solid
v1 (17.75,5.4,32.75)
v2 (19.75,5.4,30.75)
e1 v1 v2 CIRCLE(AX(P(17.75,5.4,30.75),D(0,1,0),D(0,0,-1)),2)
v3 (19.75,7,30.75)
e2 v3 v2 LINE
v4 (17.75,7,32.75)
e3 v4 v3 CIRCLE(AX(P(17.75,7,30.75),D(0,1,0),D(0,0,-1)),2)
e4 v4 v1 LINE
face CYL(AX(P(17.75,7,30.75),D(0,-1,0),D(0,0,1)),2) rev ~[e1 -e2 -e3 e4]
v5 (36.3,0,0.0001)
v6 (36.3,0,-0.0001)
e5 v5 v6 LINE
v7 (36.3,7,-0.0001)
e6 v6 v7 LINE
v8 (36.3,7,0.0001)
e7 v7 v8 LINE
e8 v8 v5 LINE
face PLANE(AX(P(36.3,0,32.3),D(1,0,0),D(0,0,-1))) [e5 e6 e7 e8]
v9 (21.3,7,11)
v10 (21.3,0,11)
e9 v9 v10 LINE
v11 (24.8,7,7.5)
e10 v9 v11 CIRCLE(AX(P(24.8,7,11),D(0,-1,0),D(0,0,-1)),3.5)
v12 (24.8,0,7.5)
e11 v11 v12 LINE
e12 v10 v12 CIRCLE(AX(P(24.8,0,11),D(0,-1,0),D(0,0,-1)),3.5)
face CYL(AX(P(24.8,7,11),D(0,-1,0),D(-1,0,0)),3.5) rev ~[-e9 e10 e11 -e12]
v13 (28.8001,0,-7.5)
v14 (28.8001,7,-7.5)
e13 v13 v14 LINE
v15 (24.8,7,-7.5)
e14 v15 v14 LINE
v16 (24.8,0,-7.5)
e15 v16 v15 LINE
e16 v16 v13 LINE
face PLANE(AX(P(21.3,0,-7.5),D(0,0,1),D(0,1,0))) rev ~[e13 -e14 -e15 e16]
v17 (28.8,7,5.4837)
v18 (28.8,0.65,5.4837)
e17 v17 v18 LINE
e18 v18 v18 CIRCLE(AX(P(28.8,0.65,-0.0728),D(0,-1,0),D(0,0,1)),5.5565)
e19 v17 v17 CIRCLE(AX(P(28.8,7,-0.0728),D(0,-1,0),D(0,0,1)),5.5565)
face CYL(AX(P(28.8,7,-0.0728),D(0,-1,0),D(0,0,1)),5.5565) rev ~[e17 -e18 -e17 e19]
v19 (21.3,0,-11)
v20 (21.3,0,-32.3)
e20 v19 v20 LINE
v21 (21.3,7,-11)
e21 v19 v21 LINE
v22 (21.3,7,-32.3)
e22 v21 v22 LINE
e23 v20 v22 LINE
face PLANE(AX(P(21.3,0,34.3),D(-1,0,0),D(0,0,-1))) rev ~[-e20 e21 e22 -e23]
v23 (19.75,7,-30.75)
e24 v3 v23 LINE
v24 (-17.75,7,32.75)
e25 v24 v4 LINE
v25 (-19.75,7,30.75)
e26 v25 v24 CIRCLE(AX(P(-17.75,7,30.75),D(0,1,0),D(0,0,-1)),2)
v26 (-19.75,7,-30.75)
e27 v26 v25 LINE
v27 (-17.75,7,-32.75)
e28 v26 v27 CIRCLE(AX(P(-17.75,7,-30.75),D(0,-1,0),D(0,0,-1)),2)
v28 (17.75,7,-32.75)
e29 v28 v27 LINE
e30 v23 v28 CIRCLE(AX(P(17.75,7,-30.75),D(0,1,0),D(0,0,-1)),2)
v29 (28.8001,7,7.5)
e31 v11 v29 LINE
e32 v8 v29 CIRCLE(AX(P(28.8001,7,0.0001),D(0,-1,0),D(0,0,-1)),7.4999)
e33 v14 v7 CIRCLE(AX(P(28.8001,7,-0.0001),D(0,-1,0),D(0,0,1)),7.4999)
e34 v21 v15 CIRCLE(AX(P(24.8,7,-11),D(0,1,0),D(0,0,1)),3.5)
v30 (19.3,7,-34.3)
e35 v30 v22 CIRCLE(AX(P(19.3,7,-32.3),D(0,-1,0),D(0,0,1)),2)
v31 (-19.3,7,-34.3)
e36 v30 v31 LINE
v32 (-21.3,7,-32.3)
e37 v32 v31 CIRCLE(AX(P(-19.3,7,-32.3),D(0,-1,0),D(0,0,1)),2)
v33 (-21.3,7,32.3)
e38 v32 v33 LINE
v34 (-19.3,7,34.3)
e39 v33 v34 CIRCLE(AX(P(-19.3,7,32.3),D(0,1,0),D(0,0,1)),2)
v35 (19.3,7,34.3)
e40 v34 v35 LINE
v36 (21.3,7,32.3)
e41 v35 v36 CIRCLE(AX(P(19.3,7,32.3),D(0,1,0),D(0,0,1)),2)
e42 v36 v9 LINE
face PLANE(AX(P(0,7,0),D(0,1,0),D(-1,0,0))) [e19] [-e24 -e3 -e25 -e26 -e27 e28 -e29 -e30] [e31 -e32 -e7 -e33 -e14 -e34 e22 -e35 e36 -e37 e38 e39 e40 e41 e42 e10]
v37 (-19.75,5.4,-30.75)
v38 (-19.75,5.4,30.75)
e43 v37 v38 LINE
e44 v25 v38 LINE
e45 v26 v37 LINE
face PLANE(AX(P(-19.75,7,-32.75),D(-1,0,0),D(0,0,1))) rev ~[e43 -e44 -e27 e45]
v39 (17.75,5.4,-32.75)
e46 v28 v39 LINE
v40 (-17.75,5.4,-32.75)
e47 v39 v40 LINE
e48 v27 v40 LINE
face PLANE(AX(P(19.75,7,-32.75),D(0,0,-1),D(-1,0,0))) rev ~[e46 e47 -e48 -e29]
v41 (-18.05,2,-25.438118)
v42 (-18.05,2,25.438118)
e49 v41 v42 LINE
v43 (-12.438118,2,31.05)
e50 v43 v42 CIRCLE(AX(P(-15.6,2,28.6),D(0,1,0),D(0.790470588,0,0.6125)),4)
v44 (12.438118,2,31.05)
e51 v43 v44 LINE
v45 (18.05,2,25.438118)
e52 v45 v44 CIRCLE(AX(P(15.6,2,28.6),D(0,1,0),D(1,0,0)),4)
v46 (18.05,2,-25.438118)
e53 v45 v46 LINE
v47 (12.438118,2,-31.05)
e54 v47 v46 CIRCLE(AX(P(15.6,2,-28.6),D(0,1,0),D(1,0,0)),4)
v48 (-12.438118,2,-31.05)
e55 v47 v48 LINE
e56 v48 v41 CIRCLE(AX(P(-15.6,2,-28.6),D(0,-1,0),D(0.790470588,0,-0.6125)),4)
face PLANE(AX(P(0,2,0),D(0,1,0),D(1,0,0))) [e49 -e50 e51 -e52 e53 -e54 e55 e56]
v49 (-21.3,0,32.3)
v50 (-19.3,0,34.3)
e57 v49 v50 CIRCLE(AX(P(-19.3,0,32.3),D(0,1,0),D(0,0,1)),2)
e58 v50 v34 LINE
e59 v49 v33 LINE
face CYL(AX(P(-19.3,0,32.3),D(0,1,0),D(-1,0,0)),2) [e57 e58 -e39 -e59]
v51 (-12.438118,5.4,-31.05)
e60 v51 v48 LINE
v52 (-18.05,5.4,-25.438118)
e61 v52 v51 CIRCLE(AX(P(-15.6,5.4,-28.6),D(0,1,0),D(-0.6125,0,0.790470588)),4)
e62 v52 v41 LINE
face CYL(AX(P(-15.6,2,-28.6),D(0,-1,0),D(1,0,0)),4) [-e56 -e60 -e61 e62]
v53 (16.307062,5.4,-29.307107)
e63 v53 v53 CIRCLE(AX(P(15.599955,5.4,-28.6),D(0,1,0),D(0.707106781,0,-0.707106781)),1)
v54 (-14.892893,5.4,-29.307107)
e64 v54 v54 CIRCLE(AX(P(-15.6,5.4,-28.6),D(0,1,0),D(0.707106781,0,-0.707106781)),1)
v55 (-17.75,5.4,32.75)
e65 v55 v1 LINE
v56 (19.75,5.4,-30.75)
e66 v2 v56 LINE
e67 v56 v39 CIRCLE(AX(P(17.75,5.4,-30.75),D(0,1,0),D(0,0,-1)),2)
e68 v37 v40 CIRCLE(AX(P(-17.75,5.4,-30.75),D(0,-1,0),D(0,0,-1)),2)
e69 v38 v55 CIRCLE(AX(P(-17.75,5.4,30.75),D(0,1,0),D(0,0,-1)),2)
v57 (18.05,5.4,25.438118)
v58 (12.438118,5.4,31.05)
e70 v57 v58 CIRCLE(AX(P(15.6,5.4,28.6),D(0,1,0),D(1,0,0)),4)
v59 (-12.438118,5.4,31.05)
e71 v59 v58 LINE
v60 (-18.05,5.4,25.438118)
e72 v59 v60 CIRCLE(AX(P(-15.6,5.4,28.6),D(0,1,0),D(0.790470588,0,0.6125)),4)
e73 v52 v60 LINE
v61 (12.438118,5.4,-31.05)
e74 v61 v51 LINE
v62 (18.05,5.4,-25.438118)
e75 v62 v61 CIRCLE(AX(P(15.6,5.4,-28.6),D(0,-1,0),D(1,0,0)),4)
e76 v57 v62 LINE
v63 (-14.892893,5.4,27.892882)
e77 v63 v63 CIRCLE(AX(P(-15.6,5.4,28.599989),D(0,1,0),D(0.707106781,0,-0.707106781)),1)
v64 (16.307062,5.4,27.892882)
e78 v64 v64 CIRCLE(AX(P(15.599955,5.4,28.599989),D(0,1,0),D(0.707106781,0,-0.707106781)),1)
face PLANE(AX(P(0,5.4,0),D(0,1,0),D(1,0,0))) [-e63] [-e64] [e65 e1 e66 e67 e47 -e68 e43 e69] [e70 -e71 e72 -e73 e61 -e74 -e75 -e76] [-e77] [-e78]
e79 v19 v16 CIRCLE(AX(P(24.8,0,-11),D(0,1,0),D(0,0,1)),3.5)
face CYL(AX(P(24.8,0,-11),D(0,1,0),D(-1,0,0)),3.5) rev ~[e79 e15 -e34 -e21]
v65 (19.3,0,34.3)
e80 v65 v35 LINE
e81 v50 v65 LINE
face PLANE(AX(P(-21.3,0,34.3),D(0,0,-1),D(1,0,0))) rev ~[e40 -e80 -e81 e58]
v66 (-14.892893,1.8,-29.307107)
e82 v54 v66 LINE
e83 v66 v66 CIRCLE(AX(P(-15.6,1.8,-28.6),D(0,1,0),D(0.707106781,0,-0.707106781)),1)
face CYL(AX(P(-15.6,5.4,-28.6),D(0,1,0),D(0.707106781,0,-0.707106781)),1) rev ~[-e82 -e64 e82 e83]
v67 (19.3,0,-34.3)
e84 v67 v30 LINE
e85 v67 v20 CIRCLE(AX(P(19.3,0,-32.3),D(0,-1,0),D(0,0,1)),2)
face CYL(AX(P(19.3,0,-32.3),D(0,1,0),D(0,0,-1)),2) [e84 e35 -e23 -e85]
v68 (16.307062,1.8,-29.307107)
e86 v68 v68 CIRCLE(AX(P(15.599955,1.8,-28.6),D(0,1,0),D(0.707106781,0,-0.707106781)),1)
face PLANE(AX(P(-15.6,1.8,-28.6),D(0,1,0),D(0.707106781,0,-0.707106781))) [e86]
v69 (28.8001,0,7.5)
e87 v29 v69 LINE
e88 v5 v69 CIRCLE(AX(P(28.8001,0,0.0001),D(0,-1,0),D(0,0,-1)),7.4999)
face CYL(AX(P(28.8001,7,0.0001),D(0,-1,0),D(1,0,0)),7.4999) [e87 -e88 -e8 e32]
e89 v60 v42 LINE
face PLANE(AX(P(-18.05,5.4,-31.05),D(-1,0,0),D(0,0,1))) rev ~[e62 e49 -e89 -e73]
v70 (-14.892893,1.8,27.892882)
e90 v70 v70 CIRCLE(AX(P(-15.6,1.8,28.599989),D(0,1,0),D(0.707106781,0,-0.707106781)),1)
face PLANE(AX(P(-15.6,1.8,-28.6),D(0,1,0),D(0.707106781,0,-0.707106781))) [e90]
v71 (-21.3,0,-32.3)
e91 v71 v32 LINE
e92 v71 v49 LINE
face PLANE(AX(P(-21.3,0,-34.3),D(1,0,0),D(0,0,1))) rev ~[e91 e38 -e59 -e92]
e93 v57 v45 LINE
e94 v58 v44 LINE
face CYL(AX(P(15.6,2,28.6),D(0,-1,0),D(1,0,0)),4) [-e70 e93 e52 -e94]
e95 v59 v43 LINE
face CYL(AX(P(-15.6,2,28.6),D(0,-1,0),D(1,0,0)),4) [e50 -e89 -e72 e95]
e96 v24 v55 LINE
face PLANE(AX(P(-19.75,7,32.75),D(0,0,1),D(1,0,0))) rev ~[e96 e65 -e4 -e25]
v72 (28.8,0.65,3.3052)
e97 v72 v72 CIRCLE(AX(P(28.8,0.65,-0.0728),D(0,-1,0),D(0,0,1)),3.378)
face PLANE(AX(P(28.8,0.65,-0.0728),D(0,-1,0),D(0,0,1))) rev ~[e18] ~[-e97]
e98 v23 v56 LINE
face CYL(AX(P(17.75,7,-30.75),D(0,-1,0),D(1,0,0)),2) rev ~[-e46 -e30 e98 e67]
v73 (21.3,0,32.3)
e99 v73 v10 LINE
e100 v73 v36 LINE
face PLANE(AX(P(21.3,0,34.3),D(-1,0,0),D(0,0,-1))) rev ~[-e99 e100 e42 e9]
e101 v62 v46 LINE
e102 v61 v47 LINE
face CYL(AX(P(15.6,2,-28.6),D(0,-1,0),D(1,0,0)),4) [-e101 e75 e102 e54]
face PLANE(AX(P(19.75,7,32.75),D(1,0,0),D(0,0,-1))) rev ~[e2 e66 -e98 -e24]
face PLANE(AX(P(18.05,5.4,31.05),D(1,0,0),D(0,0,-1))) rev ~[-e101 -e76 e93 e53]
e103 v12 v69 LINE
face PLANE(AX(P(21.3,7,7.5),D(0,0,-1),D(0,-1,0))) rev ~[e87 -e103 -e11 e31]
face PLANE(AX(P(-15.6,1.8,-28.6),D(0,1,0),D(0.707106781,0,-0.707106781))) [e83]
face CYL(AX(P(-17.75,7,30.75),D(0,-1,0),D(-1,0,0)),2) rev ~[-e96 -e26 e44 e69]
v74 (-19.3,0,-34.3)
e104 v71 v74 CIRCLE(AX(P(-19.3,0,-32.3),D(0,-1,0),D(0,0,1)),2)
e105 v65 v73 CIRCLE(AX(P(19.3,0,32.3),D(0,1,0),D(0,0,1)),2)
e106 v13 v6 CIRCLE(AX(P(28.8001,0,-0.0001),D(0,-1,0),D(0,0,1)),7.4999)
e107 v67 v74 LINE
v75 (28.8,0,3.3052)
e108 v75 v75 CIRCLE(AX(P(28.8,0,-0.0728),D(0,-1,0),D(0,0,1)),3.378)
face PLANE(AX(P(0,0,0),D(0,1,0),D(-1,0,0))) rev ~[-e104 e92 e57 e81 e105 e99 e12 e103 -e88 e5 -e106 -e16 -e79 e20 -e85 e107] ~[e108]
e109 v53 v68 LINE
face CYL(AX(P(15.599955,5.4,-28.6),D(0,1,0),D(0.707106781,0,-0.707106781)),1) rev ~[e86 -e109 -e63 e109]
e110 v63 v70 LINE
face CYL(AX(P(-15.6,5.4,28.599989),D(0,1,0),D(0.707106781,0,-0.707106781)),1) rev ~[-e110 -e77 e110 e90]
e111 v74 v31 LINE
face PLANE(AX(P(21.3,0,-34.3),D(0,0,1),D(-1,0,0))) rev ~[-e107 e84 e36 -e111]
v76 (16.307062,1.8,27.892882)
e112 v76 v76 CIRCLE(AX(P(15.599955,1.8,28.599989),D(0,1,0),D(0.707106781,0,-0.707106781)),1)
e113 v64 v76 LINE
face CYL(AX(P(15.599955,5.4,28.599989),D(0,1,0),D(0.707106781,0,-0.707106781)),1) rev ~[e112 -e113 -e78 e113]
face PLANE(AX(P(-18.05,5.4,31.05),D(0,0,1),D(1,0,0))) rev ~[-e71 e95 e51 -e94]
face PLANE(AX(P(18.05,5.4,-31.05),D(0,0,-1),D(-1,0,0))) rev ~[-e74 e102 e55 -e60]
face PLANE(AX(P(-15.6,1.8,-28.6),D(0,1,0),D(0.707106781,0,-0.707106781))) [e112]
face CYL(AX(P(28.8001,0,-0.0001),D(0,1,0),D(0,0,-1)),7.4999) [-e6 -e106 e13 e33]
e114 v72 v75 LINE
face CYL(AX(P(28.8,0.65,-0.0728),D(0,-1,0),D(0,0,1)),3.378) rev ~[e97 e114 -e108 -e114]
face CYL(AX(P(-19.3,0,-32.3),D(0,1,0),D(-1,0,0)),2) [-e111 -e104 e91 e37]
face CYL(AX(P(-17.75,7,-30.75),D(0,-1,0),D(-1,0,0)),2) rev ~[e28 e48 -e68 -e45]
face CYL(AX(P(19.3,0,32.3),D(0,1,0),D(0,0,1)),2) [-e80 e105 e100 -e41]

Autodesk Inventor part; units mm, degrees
ref_plane "YZ Plane" through (0, 0, 0) normal (1, 0, 0) x (0, 1, 0)
ref_plane "XZ Plane" through (0, 0, 0) normal (0, 1, 0) x (-1, 0, 0)
ref_plane "XY Plane" through (0, 0, 0) normal (0, 0, 1) x (1, 0, 0)
sketch "Sketch1" plane through (0, 0, 0) normal (0, 1, 0) x (-1, 0, 0)
  line L0 (21.3, 34.3) -> (-21.3, 34.3)
  line L1 (-21.3, 34.3) -> (-21.3, -34.3)
  line L2 (-21.3, -34.3) -> (21.3, -34.3)
  line L3 (21.3, -34.3) -> (21.3, 34.3)
  line L4 (21.3, 34.3) -> (-21.3, -34.3) construction
  line L5 (-21.3, 34.3) -> (21.3, -34.3) construction
  point P0 (0, 0)
  dimension "d0" = 42.6
  dimension "d1" = 68.6
extrude "Extrusion1" add sketch "Sketch1" along normal blind 7
sketch "Sketch2" plane through (0, 7, 0) normal (0, 1, 0) x (1, 0, 0)
  line L0 (-19.75, -32.75) -> (19.75, -32.75)
  line L1 (19.75, -32.75) -> (19.75, 32.75)
  line L2 (19.75, 32.75) -> (-19.75, 32.75)
  line L3 (-19.75, 32.75) -> (-19.75, -32.75)
  line L4 (-19.75, -32.75) -> (19.75, 32.75) construction
  line L5 (19.75, -32.75) -> (-19.75, 32.75) construction
  point P0 (0, 0)
  dimension "d4" = 39.5
  dimension "d5" = 65.5
extrude "Extrusion2" cut sketch "Sketch2" against normal blind 1.6
sketch "Sketch3" plane through (0, 5.4, 0) normal (0, 1, 0) x (1, 0, 0)
  line L0 (-18.05, -31.05) -> (18.05, -31.05)
  line L1 (18.05, -31.05) -> (18.05, 31.05)
  line L2 (18.05, 31.05) -> (-18.05, 31.05)
  line L3 (-18.05, 31.05) -> (-18.05, -31.05)
  line L4 (-18.05, -31.05) -> (18.05, 31.05) construction
  line L5 (18.05, -31.05) -> (-18.05, 31.05) construction
  point P0 (0, 0)
  dimension "d8" = 36.1
  dimension "d9" = 62.1
extrude "Extrusion3" cut sketch "Sketch3" against normal blind 3.4
sketch "Sketch4" plane through (0, 2, 0) normal (0, 1, 0) x (1, 0, 0)
  circle A0 centre (-15.6, 28.6) radius 4
  circle A1 centre (15.6, 28.6) radius 4
  circle A2 centre (-15.6, -28.6) radius 4
  circle A3 centre (15.6, -28.6) radius 4
  line L0 (-18.05, 31.05) -> (18.05, 31.05) projected
  line L1 (-18.05, -31.05) -> (-18.05, 31.05) projected
  point P0 (0, 0)
  dimension "d12" = 31.2
  dimension "d13" = 31.2
  dimension "d14" = 57.2
  dimension "d15" = 57.2
  dimension "d16" = 8
  dimension "d17" = 8
  dimension "d18" = 8
  dimension "d19" = 8
  dimension "d22" = 0
  dimension "d23" = 15.6
  dimension "d24" = 28.6
  dimension "d25" = 0
extrude "Extrusion4" add sketch "Sketch4" along normal blind 3.4
sketch "Sketch5" plane through (-15.6, 5.4, -28.6) normal (0, 1, 0) x (0.7071068, 0, -0.7071068)
  arc A0 (-3.9682, -0.5034) -> (3.9682, -0.5034) centre (0, 0) ccw projected
  circle A1 centre (0, 0) radius 1
  arc A2 (21.5584, -18.0935) -> (21.5584, -26.0299) centre (22.0617, -22.0617) ccw projected
  circle A3 centre (22.0617, -22.0617) radius 1
  arc A4 (-14.4166, -62.0049) -> (-22.353, -62.0049) centre (-18.3848, -62.5082) ccw projected
  circle A5 centre (-18.3848, -62.5082) radius 1
  arc A6 (-39.9431, -44.4147) -> (-39.9431, -36.4783) centre (-40.4465, -40.4465) ccw projected
  circle A7 centre (-40.4465, -40.4465) radius 1
  point P0 (-9.1924, -31.2541)
  point P1 (-0.6856, -2.9206)
  point P2 (0.6856, -2.9206)
  point P3 (-24.8409, 22.606)
  point P4 (-24.8409, 21.2347)
  point P5 (19.0704, 65.146)
  point P6 (17.6991, 65.146)
  dimension "d28" = 2
  dimension "d29" = 2
  dimension "d30" = 2
  dimension "d31" = 2
extrude "Extrusion5" cut sketch "Sketch5" against normal blind 3.6
fillet "Fillet3" radius 2 8 edges at (-19.75, 6.2, -32.75) (19.75, 6.2, -32.75) (-19.75, 6.2, 32.75) (19.75, 6.2, 32.75) (-21.3, 3.5, -34.3) (-21.3, 3.5, 34.3) (21.3, 3.5, 34.3) (21.3, 3.5, -34.3)
sketch "Sketch8" plane through (21.3, 0, 32.3) normal (1, 0, 0) x (0, 0, -1)
  line L0 (63.05, 7) -> (1.55, 7) projected
  line L1 (0, 0) -> (64.6, 0) projected
  line L2 (39.8, 7) -> (24.8, 7)
  line L3 (24.8, 7) -> (24.8, 0)
  line L4 (24.8, 0) -> (39.8, 0)
  line L5 (39.8, 0) -> (39.8, 7)
  point P0 (32.3, 0)
  point P1 (39.8, 0)
  point P2 (24.8, 7)
  dimension "d49" = 15
  dimension "d50" = 7.5
extrude "Extrusion7" add sketch "Sketch8" along normal blind 15
sketch "Sketch9" plane through (0, 7, 0) normal (0, 1, 0) x (1, 0, 0)
  line L0 (36.3, 7.5) -> (36.3, -7.5) projected
  point P0 (0, 0)
  point P1 (28.8, 0.0728)
  dimension "d60" = 7.5
hole "Hole2" at (28.8, 7, -0.0728) direction (0, -1, 0) diameter 6.756 end through all counterbore diameter 11.113 counterbore depth 6.35 clearance for "Socket Head Cap Screw" size "1/4" standard "Ansi Unified Screw Threads"
fillet "Fillet4" radius 3.5 2 edges at (21.3, 3.5, -7.5) (21.3, 3.5, 7.5)
fillet "Fillet5" radius 7.5 2 edges at (36.3, 3.5, 7.5) (36.3, 3.5, -7.5)
equation "\"d13\" = d12"
equation "\"d14\" = d15"
equation "\"d23\" = 0.5 * d12"
equation "\"d24\" = 0.5 * d15"
equation "\"d50\" = 0.5 * d49"
properties part number "Thermister_Amp_Mount"
